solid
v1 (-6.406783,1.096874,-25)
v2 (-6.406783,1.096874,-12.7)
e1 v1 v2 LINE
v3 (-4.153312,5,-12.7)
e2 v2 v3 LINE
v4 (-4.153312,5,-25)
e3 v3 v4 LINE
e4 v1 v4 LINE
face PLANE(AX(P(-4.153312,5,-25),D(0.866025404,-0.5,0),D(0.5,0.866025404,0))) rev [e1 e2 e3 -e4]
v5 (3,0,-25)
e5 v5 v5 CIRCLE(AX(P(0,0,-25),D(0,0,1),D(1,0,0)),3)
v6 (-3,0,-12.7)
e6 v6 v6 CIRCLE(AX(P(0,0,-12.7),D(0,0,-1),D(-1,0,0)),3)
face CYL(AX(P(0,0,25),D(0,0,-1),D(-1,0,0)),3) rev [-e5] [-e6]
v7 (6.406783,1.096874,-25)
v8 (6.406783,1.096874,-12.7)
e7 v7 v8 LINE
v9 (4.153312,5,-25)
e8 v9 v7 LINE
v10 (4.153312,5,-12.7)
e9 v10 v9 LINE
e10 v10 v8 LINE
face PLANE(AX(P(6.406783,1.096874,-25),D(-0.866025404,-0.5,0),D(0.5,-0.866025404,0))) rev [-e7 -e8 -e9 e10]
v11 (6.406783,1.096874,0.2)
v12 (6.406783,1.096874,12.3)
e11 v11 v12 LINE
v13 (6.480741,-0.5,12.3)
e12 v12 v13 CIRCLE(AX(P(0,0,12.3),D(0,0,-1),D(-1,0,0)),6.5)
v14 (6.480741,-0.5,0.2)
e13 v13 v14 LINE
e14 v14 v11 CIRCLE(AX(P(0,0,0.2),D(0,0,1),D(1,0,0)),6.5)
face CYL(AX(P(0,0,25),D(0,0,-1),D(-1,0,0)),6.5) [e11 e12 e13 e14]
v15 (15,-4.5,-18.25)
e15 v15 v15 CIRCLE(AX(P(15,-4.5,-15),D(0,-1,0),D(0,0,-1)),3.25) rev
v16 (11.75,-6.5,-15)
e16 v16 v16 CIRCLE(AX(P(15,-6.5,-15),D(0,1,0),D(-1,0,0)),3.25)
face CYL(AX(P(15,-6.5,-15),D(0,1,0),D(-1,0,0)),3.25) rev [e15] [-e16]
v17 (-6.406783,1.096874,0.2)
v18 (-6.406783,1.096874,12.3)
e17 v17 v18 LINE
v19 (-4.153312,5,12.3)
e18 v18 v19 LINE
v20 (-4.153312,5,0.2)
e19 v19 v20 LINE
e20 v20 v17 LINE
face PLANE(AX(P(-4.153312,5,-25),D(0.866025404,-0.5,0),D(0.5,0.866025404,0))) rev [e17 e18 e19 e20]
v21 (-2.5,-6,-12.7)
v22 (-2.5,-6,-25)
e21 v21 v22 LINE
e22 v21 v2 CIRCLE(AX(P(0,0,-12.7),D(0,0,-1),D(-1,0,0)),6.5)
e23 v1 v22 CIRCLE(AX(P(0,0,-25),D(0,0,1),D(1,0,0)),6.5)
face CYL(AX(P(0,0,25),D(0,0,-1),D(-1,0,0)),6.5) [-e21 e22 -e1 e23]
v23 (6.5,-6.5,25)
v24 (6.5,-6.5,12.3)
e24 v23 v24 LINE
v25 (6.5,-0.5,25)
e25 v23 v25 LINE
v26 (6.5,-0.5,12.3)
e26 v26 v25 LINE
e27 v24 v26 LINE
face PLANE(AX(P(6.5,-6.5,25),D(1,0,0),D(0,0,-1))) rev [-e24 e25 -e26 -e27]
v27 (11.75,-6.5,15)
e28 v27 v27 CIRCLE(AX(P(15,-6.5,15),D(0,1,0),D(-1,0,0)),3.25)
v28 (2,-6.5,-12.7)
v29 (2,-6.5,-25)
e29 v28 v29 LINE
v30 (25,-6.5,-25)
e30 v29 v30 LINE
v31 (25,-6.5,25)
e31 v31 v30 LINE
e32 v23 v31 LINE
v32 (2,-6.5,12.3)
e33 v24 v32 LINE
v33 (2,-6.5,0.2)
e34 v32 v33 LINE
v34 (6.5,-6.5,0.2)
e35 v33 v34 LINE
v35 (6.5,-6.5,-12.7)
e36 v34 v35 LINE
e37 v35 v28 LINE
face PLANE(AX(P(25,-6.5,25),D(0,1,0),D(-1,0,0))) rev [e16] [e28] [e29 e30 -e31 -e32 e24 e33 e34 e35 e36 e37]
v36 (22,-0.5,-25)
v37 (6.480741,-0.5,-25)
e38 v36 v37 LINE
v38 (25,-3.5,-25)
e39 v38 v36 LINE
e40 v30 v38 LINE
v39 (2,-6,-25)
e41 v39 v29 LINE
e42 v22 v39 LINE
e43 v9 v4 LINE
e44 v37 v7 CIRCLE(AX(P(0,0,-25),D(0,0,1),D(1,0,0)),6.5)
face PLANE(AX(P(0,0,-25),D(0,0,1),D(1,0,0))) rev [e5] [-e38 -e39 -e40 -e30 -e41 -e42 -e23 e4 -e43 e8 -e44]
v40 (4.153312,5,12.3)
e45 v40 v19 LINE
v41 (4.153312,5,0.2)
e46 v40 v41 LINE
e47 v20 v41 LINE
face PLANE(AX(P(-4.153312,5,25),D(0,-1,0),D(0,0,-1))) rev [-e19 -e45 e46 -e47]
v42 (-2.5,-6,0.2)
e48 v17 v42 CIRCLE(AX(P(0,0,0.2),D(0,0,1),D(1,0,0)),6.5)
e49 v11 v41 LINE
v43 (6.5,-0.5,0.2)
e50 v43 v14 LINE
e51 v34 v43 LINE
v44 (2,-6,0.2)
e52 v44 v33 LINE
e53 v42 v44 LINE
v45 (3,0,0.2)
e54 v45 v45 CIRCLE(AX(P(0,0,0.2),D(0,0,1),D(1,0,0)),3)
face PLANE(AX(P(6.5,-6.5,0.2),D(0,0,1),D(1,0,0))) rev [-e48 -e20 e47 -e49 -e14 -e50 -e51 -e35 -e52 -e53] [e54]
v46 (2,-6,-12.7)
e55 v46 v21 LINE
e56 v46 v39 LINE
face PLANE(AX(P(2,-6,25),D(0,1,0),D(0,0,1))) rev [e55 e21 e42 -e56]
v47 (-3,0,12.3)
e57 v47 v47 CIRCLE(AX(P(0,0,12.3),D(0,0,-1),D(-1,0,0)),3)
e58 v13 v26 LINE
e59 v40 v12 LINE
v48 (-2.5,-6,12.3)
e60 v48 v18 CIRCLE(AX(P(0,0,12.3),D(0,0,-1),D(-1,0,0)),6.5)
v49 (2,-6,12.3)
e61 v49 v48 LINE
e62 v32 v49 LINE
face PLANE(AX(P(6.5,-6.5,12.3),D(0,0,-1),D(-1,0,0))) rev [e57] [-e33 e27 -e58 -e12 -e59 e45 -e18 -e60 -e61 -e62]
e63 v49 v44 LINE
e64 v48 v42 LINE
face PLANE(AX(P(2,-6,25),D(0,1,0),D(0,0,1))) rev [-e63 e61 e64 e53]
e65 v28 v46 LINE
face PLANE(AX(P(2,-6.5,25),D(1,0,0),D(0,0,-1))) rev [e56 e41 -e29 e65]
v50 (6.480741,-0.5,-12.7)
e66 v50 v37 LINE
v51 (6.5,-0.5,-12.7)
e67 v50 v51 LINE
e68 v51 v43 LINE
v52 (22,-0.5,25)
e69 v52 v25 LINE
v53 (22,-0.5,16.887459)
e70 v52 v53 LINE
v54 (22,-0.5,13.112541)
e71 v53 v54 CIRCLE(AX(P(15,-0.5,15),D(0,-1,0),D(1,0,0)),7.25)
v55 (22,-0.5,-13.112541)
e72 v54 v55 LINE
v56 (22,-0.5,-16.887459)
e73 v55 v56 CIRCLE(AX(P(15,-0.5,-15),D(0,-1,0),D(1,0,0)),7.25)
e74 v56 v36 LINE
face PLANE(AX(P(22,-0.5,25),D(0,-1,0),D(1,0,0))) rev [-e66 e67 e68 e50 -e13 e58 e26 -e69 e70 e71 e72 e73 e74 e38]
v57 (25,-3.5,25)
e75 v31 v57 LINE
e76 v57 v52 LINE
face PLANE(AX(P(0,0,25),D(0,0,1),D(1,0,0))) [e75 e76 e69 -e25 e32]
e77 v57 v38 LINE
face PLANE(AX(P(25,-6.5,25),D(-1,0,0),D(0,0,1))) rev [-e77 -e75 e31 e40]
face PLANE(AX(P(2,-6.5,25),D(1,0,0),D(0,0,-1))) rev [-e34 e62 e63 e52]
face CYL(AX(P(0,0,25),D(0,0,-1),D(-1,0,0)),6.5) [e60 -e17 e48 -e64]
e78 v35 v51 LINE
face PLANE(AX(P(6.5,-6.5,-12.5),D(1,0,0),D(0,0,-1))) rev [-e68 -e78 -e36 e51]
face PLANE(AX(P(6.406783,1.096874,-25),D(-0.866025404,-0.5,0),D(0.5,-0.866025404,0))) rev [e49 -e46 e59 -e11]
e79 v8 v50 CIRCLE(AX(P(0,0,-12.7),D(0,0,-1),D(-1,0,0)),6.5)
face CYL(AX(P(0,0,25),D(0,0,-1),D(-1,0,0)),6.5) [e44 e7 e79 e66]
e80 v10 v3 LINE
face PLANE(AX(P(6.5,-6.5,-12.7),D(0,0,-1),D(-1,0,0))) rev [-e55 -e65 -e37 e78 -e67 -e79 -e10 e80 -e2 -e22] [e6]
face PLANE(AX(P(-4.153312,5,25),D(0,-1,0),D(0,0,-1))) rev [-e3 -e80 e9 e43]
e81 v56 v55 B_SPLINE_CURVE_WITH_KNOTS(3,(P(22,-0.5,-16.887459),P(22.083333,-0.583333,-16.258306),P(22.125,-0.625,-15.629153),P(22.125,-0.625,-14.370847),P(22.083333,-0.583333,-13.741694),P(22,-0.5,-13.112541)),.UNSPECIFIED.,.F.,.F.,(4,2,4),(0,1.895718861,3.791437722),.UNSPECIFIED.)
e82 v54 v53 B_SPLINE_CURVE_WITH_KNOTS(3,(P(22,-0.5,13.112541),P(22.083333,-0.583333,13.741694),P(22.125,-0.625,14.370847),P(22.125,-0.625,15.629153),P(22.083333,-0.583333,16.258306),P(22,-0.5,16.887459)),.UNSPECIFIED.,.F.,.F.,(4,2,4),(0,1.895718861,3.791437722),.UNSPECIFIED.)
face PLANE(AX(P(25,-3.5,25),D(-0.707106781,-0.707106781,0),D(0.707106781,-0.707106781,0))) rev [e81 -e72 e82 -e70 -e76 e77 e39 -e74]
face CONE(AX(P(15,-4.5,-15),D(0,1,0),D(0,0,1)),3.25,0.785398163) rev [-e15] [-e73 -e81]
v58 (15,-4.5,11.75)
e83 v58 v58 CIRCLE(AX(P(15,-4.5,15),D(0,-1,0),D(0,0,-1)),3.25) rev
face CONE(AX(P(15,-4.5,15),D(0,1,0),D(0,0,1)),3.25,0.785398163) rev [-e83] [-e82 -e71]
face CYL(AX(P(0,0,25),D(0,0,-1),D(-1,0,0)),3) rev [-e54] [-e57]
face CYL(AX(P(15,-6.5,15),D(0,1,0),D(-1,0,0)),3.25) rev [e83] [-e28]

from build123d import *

# Parameters (mm, degrees)
SKETCH2_R           = 3
BOSS_EXTRUDE1_DEPTH = 25
SKETCH3_R           = 3.25
CUT_EXTRUDE1_DEPTH  = 36.860842154
CHAMFER1_SIZE       = 4
CUT_EXTRUDE2_DEPTH  = 57.278326201
SKETCH5_W           = 13
SKETCH5_H           = 12.5
CUT_EXTRUDE3_DEPTH  = 38.17862289
SKETCH6_W           = 13
SKETCH6_H           = 0.2
CUT_EXTRUDE4_DEPTH  = 38.17862289


with BuildPart() as part:
    # Sketch2 → Boss-Extrude1 (new, symmetric)
    with BuildSketch(Plane.XY):
        with BuildLine():
            Line((25, -6.5), (2, -6.5))
            Line((2, -6.5), (2, -6))
            Line((2, -6), (-2.5, -6))
            ThreePointArc((-2.5, -6), (-6.427802106, -0.966105629), (-4.153311931, 5))
            Line((-4.153311931, 5), (4.153311931, 5))
            ThreePointArc((4.153311931, 5), (5.986089611, 2.533126757), (6.480740698, -0.5))
            Line((6.480740698, -0.5), (22, -0.5))
            Line((22, -0.5), (25, -3.5))
            Line((25, -3.5), (25, -6.5))
        make_face()
        Circle(SKETCH2_R, mode=Mode.SUBTRACT)
    extrude(amount=BOSS_EXTRUDE1_DEPTH, both=True)

    # Sketch3 → Cut-Extrude1 (cut, through all)
    with BuildSketch(Plane(origin=(0, -0.5, 0), x_dir=(1, 0, 0), z_dir=(0, 1, 0))):
        with Locations(Location((15, 15, 0), (0, 0, 180))):
            Circle(SKETCH3_R)
        with Locations(Location((15, -15, 0), (0, 0, 180))):
            Circle(SKETCH3_R)
    extrude(amount=-CUT_EXTRUDE1_DEPTH, mode=Mode.SUBTRACT)

    # Chamfer1
    # the kernel refuses this chamfer: 4 mm, written as the material it takes off along each edge
    with BuildSketch(Plane(origin=(15, -0.5, -15), x_dir=(-1, 0, 0), z_dir=(0, 0, -1))) as chamfer1_piece_1:
        Polygon((3.25, -CHAMFER1_SIZE), (3.25 + CHAMFER1_SIZE, 0), (3.25, 0), align=None)
    revolve(axis=Axis((15, -0.5, -15), (0, 1, 0)), mode=Mode.SUBTRACT)
    with BuildSketch(Plane(origin=(15, -0.5, 15), x_dir=(-1, 0, 0), z_dir=(0, 0, -1))) as chamfer1_piece_2:
        Polygon((3.25, -CHAMFER1_SIZE), (3.25 + CHAMFER1_SIZE, 0), (3.25, 0), align=None)
    revolve(axis=Axis((15, -0.5, 15), (0, 1, 0)), mode=Mode.SUBTRACT)

    # Sketch4 → Cut-Extrude2 (cut, through all)
    with BuildSketch(Plane.XY.offset(25)):
        with BuildLine():
            Line((6.406782985, 1.096873642), (4.153311931, 5))
            ThreePointArc((4.153311931, 5), (5.629165125, 3.25), (6.406782985, 1.096873642))
        make_face()
        with BuildLine():
            Line((-4.153311931, 5), (-6.406782985, 1.096873642))
            ThreePointArc((-6.406782985, 1.096873642), (-5.629165125, 3.25), (-4.153311931, 5))
        make_face()
    extrude(amount=-CUT_EXTRUDE2_DEPTH, mode=Mode.SUBTRACT)

    # Sketch5 → Cut-Extrude3 (cut, through all)
    with BuildSketch(Plane(origin=(0, 5, 0), x_dir=(1, 0, 0), z_dir=(0, 1, 0))):
        with Locations((0, -18.75)):
            Rectangle(SKETCH5_W, SKETCH5_H)
        with Locations((0, 6.25)):
            Rectangle(SKETCH5_W, SKETCH5_H)
    extrude(amount=-CUT_EXTRUDE3_DEPTH, mode=Mode.SUBTRACT)

    # Sketch6 → Cut-Extrude4 (cut, through all)
    with BuildSketch(Plane(origin=(0, 5, 0), x_dir=(1, 0, 0), z_dir=(0, 1, 0))):
        with Locations((0, -0.1)):
            Rectangle(SKETCH6_W, SKETCH6_H)
        with Locations((0, -12.4)):
            Rectangle(SKETCH6_W, SKETCH6_H)
        with Locations((0, 12.6)):
            Rectangle(SKETCH6_W, SKETCH6_H)
    extrude(amount=-CUT_EXTRUDE4_DEPTH, mode=Mode.SUBTRACT)


solid = part.part
